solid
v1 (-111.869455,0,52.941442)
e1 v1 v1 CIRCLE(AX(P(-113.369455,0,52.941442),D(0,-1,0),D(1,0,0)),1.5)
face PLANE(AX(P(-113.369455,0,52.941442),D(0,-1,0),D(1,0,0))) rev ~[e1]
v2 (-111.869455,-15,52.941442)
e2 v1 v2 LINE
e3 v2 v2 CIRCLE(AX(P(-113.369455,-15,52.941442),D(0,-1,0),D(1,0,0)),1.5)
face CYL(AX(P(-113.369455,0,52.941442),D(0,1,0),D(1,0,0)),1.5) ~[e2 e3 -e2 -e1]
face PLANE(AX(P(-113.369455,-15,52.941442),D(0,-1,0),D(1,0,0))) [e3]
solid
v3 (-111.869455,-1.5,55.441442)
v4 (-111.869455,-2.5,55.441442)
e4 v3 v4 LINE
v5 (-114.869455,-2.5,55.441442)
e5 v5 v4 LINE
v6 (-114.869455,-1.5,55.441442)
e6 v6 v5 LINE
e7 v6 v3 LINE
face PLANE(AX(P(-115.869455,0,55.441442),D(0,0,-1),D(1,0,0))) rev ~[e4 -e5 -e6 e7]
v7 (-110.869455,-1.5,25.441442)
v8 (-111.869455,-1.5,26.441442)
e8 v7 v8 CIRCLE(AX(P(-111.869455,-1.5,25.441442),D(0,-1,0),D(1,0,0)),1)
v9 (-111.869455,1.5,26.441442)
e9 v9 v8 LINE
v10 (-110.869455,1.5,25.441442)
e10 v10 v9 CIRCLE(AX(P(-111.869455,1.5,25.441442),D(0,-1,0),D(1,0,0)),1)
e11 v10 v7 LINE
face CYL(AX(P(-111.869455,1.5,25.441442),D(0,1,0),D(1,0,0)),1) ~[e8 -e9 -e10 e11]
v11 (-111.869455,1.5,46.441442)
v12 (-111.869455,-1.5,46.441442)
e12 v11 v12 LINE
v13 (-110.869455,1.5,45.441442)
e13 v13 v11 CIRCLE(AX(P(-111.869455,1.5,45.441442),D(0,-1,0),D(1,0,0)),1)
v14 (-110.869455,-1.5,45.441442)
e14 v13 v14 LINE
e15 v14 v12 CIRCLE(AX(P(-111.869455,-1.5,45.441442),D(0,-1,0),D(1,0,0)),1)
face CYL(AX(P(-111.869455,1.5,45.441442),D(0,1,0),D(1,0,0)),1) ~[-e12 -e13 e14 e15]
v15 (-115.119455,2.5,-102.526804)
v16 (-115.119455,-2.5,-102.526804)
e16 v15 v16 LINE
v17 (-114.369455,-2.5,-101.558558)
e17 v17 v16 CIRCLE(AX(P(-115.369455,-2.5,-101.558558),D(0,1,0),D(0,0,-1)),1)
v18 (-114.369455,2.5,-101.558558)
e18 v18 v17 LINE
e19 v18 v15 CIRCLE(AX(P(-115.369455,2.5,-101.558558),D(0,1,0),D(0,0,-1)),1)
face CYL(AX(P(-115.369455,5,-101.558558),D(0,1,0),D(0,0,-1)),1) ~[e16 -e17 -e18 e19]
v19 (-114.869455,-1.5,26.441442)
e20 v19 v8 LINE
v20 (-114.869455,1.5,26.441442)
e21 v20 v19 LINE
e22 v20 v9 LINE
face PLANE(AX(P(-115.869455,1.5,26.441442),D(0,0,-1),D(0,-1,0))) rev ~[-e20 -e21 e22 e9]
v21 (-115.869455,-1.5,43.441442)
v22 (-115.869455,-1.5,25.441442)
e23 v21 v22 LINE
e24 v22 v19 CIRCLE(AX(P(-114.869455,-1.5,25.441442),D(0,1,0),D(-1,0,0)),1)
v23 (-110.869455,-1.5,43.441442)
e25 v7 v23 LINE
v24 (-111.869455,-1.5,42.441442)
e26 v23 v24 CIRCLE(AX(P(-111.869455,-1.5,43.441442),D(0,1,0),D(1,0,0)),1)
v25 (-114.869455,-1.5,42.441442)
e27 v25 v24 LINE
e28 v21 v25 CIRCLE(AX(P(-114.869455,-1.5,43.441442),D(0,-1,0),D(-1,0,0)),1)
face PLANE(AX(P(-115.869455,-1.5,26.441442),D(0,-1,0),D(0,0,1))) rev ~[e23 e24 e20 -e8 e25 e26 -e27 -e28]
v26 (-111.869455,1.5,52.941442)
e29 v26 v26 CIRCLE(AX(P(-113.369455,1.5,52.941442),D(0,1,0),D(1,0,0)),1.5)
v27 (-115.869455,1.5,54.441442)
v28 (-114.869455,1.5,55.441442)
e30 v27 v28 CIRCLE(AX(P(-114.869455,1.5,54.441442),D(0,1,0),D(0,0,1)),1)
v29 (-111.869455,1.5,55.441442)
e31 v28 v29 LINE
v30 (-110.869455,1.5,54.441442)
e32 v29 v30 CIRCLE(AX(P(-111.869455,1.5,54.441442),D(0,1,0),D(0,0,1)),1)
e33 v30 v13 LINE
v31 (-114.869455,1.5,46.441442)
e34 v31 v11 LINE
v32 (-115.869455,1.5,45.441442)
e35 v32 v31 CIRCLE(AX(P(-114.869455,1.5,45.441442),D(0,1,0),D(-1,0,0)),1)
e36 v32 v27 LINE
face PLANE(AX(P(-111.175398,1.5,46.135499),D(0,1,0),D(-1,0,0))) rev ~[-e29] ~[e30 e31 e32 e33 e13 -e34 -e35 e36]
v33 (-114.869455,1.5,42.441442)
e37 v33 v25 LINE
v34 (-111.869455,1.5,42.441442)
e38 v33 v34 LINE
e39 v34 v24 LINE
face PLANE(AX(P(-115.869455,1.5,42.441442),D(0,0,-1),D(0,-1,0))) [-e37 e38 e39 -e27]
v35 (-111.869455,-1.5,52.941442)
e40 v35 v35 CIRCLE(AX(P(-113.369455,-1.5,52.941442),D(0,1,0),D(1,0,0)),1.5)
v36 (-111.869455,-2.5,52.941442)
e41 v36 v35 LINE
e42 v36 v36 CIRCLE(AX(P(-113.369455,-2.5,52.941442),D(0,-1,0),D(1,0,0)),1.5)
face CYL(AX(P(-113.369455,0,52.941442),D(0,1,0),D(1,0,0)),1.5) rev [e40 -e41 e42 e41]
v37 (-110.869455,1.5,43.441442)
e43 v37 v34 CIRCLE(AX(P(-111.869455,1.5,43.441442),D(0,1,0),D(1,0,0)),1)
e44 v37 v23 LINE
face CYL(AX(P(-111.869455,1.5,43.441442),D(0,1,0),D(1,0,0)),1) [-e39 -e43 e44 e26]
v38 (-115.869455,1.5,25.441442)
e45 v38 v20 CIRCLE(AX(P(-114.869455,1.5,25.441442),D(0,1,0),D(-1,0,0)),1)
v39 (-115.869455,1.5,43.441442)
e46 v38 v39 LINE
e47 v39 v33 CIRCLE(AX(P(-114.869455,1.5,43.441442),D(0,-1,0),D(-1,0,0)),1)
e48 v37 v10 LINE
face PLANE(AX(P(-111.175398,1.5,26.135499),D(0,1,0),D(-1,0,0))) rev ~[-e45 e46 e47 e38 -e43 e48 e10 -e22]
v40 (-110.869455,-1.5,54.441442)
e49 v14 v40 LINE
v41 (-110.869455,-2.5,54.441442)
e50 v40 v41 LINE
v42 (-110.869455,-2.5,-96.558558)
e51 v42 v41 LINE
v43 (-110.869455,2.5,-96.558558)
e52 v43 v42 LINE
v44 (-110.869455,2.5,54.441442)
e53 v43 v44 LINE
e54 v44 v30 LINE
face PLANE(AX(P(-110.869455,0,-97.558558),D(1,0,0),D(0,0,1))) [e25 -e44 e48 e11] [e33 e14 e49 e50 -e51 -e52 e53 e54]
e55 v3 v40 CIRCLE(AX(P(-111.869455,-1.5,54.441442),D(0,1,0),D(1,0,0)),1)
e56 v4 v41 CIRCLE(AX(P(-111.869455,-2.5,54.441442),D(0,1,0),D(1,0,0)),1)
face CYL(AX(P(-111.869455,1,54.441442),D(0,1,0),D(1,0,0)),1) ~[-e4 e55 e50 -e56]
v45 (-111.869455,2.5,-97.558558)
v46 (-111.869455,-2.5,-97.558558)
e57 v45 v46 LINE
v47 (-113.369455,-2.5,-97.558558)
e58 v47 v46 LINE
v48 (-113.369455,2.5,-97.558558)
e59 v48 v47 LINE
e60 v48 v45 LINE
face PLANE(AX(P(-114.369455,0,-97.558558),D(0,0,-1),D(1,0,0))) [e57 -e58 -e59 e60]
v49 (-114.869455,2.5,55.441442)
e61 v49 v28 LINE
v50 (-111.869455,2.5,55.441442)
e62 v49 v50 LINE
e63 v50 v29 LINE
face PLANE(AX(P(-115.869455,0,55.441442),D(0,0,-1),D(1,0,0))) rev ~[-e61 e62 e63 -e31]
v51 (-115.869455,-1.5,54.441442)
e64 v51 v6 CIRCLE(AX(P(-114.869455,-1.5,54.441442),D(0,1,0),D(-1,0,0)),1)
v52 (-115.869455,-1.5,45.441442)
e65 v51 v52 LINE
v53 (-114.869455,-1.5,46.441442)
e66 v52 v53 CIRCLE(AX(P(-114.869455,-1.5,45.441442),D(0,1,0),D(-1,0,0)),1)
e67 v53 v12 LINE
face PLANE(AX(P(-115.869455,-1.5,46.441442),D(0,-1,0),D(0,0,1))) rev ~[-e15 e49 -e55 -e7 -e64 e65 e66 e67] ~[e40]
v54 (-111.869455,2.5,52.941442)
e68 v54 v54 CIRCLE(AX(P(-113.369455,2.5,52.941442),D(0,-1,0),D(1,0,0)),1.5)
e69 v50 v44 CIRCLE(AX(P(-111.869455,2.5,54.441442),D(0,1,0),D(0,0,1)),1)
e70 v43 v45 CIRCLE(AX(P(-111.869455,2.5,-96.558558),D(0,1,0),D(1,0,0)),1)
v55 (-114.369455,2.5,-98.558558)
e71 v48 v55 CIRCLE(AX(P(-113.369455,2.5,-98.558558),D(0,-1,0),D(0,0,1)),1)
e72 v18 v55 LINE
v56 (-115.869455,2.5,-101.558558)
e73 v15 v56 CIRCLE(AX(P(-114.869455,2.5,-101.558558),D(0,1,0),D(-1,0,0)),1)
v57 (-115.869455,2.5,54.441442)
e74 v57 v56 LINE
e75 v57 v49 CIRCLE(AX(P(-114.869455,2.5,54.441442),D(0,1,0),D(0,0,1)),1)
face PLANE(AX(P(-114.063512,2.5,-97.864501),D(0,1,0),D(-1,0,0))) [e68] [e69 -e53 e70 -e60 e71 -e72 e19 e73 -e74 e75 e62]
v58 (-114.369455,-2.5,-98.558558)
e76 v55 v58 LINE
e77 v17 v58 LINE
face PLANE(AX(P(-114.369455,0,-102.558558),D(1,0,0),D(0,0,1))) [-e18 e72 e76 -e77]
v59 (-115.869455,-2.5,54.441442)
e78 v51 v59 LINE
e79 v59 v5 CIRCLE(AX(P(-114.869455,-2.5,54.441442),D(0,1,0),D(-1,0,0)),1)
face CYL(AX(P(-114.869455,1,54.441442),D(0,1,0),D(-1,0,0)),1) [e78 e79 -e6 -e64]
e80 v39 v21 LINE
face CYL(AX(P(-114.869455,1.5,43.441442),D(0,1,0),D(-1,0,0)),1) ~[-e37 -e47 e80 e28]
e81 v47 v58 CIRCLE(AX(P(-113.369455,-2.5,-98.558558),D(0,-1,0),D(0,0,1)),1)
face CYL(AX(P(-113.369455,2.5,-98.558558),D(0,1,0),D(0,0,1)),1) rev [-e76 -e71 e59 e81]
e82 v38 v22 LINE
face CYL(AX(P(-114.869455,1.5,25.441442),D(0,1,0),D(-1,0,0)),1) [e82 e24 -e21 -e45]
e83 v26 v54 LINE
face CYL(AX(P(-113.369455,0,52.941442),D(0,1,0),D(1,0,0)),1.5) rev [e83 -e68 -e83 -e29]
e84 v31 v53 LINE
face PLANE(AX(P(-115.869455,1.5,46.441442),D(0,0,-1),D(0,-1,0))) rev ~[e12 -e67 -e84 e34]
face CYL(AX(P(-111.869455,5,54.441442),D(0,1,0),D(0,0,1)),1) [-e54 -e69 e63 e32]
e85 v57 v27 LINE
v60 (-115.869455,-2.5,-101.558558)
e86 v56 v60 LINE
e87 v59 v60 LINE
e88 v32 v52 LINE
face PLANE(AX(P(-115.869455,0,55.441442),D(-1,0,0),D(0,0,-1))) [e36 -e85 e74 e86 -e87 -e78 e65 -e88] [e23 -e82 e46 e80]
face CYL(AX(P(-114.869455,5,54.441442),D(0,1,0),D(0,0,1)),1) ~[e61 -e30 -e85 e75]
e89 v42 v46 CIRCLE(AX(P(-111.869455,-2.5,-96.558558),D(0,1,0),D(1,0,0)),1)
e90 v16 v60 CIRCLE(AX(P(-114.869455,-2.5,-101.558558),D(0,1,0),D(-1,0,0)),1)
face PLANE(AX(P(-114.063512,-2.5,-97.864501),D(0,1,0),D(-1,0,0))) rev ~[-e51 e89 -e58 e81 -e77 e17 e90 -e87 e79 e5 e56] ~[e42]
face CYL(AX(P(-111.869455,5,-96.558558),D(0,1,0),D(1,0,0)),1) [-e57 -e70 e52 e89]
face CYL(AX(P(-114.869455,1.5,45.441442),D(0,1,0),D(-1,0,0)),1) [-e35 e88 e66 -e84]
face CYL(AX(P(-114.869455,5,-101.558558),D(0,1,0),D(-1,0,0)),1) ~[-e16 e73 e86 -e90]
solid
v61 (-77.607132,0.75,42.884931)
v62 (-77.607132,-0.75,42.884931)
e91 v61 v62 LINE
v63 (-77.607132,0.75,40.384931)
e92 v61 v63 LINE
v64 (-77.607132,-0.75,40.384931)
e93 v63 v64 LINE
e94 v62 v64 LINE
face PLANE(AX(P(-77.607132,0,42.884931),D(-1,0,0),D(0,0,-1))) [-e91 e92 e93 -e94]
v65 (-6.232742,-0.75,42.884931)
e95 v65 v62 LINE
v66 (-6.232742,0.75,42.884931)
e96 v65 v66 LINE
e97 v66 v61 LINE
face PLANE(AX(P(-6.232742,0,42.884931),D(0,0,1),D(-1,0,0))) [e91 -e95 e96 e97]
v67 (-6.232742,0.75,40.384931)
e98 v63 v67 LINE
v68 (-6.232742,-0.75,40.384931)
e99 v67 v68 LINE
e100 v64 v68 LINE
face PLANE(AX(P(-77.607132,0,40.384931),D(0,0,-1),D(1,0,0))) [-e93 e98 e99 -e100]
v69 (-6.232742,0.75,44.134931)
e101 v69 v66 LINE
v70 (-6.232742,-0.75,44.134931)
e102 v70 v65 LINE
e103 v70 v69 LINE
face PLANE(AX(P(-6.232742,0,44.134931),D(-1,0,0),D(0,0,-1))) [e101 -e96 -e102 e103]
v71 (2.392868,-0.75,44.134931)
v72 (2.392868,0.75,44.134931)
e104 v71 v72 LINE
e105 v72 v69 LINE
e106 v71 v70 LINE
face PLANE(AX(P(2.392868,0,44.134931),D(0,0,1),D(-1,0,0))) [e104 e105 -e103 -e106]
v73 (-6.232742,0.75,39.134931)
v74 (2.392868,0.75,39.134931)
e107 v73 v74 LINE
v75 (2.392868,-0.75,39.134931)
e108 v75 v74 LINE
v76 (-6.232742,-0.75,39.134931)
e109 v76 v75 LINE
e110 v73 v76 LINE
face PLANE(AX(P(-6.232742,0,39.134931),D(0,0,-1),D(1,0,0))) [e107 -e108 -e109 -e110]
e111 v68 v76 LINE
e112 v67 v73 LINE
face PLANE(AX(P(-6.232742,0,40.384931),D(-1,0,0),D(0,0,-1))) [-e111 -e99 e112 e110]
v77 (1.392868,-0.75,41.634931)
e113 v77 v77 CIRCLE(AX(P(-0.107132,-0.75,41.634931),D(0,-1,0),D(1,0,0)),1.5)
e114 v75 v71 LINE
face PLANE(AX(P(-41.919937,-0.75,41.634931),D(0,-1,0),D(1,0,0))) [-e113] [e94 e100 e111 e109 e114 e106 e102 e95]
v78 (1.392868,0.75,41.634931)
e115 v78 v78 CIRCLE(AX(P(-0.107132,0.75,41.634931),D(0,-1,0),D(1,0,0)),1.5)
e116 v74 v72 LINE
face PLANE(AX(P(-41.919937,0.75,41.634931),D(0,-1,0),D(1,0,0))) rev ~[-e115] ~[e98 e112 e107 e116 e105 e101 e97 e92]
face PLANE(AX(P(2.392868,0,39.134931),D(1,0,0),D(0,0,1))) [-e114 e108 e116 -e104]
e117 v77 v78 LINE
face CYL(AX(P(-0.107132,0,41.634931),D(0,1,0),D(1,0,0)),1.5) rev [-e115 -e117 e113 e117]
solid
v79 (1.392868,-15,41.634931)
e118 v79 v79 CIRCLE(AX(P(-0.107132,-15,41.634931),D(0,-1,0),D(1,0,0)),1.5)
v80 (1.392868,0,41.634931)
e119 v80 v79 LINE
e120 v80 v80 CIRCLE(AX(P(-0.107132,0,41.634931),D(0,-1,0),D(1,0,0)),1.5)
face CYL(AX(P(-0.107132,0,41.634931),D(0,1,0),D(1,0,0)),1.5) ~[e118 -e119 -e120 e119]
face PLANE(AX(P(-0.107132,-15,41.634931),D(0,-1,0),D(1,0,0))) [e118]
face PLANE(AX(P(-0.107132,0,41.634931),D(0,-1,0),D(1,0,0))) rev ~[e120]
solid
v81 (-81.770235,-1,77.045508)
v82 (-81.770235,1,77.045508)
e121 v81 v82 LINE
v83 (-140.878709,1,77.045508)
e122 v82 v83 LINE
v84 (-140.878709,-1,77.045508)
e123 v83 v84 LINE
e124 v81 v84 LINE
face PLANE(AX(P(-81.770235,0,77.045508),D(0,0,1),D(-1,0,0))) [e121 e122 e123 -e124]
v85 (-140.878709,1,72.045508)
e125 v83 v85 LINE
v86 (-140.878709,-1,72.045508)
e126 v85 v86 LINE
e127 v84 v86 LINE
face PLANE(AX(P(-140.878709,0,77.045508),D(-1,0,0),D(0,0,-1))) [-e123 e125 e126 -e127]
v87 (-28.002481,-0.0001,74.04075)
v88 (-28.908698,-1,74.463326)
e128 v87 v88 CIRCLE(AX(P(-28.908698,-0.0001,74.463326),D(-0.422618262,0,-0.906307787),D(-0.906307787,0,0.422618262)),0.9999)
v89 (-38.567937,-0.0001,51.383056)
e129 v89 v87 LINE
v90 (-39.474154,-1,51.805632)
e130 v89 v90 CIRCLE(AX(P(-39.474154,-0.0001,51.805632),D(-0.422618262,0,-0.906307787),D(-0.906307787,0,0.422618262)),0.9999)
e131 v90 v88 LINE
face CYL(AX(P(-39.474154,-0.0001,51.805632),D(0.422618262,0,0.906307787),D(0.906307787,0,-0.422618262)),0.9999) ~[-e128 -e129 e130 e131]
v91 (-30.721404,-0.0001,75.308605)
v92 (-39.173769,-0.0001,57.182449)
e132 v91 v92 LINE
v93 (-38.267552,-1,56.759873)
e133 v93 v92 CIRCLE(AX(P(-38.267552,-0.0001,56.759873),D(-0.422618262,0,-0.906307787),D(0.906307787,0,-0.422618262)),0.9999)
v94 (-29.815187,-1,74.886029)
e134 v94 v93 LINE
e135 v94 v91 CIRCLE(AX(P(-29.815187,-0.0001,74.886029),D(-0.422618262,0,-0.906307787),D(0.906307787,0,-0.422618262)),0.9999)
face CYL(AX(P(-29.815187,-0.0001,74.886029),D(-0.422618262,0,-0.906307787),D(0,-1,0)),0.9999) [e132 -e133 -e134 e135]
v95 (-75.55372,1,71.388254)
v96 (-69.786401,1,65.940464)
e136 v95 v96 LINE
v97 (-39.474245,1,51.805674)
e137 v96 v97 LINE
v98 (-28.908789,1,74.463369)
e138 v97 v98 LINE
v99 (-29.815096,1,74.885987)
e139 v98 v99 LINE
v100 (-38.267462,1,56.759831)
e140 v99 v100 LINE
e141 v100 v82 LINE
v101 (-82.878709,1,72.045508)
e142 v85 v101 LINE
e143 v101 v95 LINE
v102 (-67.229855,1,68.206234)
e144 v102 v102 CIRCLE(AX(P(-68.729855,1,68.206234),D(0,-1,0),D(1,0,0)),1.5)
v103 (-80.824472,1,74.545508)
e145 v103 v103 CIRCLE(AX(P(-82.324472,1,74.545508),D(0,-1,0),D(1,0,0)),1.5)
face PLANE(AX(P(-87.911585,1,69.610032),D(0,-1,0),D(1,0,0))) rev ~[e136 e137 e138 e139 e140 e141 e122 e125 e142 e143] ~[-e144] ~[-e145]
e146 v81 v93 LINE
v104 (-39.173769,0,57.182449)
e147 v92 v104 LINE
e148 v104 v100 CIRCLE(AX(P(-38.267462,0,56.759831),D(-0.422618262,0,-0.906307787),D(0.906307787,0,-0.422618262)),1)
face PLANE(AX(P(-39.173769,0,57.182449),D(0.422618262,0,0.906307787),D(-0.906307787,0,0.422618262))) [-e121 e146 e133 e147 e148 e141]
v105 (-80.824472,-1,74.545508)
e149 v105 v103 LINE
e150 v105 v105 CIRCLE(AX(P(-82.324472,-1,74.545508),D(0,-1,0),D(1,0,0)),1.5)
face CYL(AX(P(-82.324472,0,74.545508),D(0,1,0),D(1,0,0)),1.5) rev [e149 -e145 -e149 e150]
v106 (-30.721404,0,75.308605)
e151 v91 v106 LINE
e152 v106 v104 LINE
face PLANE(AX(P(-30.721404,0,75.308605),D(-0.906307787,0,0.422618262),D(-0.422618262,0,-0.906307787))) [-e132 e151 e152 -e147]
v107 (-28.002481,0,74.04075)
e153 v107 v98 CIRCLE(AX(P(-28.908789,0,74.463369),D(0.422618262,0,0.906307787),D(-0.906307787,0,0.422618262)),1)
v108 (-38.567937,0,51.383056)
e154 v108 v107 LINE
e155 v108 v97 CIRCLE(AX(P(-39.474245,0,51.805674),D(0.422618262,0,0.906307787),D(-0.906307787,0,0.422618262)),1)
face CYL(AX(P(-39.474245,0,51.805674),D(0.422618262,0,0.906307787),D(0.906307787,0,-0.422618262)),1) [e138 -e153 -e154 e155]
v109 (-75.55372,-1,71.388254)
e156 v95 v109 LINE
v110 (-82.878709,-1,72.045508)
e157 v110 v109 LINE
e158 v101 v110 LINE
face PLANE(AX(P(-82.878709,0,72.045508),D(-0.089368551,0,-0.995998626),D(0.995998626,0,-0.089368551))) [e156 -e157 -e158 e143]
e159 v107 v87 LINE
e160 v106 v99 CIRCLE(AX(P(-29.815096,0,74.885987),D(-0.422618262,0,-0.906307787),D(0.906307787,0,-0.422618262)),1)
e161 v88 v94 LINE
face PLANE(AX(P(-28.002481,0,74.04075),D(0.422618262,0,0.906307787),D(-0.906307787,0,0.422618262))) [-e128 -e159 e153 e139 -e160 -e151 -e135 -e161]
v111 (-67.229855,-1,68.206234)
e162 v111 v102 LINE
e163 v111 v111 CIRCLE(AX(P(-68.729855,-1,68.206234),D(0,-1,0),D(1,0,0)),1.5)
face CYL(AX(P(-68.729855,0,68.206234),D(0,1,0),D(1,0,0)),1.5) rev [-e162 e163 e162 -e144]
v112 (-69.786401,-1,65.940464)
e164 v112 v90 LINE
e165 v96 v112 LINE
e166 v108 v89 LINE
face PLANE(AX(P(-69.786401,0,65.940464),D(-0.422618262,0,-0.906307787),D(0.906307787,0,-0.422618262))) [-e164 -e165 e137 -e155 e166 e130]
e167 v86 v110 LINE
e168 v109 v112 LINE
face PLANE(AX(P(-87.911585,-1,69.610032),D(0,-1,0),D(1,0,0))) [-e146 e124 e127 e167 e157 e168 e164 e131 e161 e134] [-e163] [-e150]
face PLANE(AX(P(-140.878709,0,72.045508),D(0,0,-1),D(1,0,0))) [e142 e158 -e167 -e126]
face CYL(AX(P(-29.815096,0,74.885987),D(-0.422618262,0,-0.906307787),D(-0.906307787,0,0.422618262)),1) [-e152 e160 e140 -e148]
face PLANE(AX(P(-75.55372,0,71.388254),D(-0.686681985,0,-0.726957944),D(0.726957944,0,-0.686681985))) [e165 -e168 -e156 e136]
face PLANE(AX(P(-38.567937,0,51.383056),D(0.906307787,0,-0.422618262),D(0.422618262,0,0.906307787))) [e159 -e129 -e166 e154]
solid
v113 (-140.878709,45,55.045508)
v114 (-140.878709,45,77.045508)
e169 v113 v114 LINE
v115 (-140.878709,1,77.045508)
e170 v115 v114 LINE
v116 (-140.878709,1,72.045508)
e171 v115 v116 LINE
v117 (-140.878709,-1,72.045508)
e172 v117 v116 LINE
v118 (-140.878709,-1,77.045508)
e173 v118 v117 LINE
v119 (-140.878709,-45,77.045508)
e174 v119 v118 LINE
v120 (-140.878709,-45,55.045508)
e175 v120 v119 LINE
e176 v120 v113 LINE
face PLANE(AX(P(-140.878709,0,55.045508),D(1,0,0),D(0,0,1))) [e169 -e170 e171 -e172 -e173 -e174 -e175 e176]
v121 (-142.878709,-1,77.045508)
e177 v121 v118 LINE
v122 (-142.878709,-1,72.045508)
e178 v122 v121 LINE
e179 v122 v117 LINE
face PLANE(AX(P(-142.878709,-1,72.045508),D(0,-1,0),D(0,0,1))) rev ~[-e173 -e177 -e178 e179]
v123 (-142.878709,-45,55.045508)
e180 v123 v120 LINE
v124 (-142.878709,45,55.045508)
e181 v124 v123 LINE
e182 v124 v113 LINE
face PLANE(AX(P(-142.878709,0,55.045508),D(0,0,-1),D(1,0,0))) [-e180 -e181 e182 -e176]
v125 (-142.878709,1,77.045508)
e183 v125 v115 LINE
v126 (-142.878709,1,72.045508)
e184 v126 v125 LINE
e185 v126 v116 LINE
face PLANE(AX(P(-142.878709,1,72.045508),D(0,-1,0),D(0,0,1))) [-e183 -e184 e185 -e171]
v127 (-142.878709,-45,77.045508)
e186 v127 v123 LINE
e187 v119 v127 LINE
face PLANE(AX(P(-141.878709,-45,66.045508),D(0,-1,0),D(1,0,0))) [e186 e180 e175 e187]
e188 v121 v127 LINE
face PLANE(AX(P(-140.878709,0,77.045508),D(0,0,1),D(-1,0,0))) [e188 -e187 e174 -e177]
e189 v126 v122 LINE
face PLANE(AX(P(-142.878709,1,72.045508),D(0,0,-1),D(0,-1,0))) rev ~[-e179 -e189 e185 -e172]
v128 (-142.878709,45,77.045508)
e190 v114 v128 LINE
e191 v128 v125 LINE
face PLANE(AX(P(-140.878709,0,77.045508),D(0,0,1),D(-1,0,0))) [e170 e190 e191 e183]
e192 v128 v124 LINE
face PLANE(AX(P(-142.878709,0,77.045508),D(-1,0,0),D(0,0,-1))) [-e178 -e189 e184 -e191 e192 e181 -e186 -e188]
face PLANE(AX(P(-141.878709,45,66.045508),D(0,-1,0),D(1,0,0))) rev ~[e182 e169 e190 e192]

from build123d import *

# Parameters (mm, degrees)
F0_R        = 1.5
F1_DEPTH    = 0.75
F0_W        = 5
F0_H        = 12.5
F0_H_2      = 16
F2_DEPTH    = 2.5
F3_DEPTH    = 1
F4_DEPTH    = 45
F5_W        = 3
F5_H        = 9
F5_H_2      = 16
F6_DEPTH    = 118.2633225451
F7_T1_DEPTH = 5
F7_T3_DEPTH = 6
F7_T5_DEPTH = 6
F7_T7_DEPTH = 10
F7_T9_DEPTH = 3
F7_2_F1_R   = 1
F7_2_F2_R   = 0.9999
F7_2_F3_R   = 1
F7_2_F4_R   = 0.9999
F9_W        = 2
F9_H        = 5
F10_DEPTH   = 25
F11_DEPTH   = 15


# Not quite as in the source:
# - a fillet or chamfer that OpenCascade refuses, or shapes differently, is made with other operations: its cross-section is extruded or revolved along the edge and cut away or added
# - two fillets or chamfers of one size are made in one step
# - a fillet or chamfer is up to 0.001 mm smaller than in the source, because OpenCascade refuses the exact size


with BuildPart() as f1:
    # F0 (on Front) → F1 (new body, symmetric)
    with BuildSketch(Plane.XZ):
        Polygon((-6.2327417545, 42.8849308193), (-77.6071324944, 42.8849308193), (-77.6071324944, 40.3849308193), (-6.2327417545, 40.3849308193), (-6.2327417545, 41.6349308193), align=None)
        Polygon((2.3928675056, 44.1349308193), (-6.2327417545, 44.1349308193), (-6.2327417545, 42.8849308193), (-6.2327417545, 41.6349308193), (-6.2327417545, 40.3849308193), (-6.2327417545, 39.1349308193), (2.3928675056, 39.1349308193), align=None)
        with Locations((-0.1071324944, 41.6349308193)):
            Circle(F0_R, mode=Mode.SUBTRACT)
    extrude(amount=F1_DEPTH, both=True)


with BuildPart() as f2:
    # F0 (on Front) → F2 (new body, symmetric)
    with BuildSketch(Plane.XZ):
        with Locations((-113.3694550395, 49.191441834)):
            Rectangle(F0_W, F0_H)
        with Locations((-113.3694550395, 52.941441834)):
            Circle(F0_R, mode=Mode.SUBTRACT)
        Polygon((-110.8694550395, 26.941441834), (-115.8694550395, 26.941441834), (-115.8694550395, -102.558558166), (-114.3694550395, -102.558558166), (-114.3694550395, -97.558558166), (-112.3694550395, -97.558558166), (-110.8694550395, -97.558558166), align=None)
        with Locations((-113.3694550395, 34.941441834)):
            Rectangle(F0_W, F0_H_2)
    extrude(amount=F2_DEPTH, both=True)

    # F5 (on face) → F6 (cut, through all)
    with BuildSketch(Plane(origin=(-115.8694550395, 0, 0), x_dir=(0, -1, 0), z_dir=(-1, 0, 0))):
        with Locations((0, 50.941441834)):
            Rectangle(F5_W, F5_H)
        with Locations((0, 34.441441834)):
            Rectangle(F5_W, F5_H_2)
    extrude(amount=-F6_DEPTH, mode=Mode.SUBTRACT)

    # F7: fillet of radius 1 on 14 edges, made by hand

    # F7_s2 → F7_t1 (join)
    with BuildSketch(Plane.XZ.offset(-2.5)):
        with BuildLine():
            ThreePointArc((-113.3694550395, -97.558558166), (-114.0765618207, -97.8514513848), (-114.3694550395, -98.558558166))
            Line((-114.3694550395, -98.558558166), (-114.3694550395, -97.558558166))
            Line((-114.3694550395, -97.558558166), (-113.3694550395, -97.558558166))
        make_face()
    extrude(amount=F7_T1_DEPTH)

    # F7_s4 → F7_t3 (cut)
    with BuildSketch(Plane.XZ.offset(-1)):
        with BuildLine():
            ThreePointArc((-110.8694550395, 54.441441834), (-111.1623482583, 55.1485486152), (-111.8694550395, 55.441441834))
            Line((-111.8694550395, 55.441441834), (-110.8694550395, 55.441441834))
            Line((-110.8694550395, 55.441441834), (-110.8694550395, 54.441441834))
        make_face()
        with BuildLine():
            ThreePointArc((-115.8694550395, 54.441441834), (-115.5765618207, 55.1485486152), (-114.8694550395, 55.441441834))
            Line((-114.8694550395, 55.441441834), (-115.8694550395, 55.441441834))
            Line((-115.8694550395, 55.441441834), (-115.8694550395, 54.441441834))
        make_face()
    extrude(amount=F7_T3_DEPTH, mode=Mode.SUBTRACT)

    # F7_s6 → F7_t5 (cut)
    with BuildSketch(Plane.XZ.offset(-5)):
        with BuildLine():
            ThreePointArc((-111.8694550395, 55.441441834), (-111.1623482583, 55.1485486152), (-110.8694550395, 54.441441834))
            Line((-110.8694550395, 54.441441834), (-110.8694550395, 55.441441834))
            Line((-110.8694550395, 55.441441834), (-111.8694550395, 55.441441834))
        make_face()
        with BuildLine():
            ThreePointArc((-114.8694550395, 55.441441834), (-115.5765618207, 55.1485486152), (-115.8694550395, 54.441441834))
            Line((-115.8694550395, 54.441441834), (-115.8694550395, 55.441441834))
            Line((-115.8694550395, 55.441441834), (-114.8694550395, 55.441441834))
        make_face()
    extrude(amount=F7_T5_DEPTH, mode=Mode.SUBTRACT)

    # F7_s8 → F7_t7 (cut)
    with BuildSketch(Plane.XZ.offset(-5)):
        with BuildLine():
            ThreePointArc((-115.3694550395, -102.558558166), (-114.6623482583, -102.2656649472), (-114.3694550395, -101.558558166))
            Line((-114.3694550395, -101.558558166), (-114.3694550395, -102.558558166))
            Line((-114.3694550395, -102.558558166), (-115.3694550395, -102.558558166))
        make_face()
        with BuildLine():
            ThreePointArc((-115.8694550395, -101.558558166), (-115.5765618207, -102.2656649472), (-114.8694550395, -102.558558166))
            Line((-114.8694550395, -102.558558166), (-115.8694550395, -102.558558166))
            Line((-115.8694550395, -102.558558166), (-115.8694550395, -101.558558166))
        make_face()
        with BuildLine():
            ThreePointArc((-110.8694550395, -96.558558166), (-111.1623482583, -97.2656649472), (-111.8694550395, -97.558558166))
            Line((-111.8694550395, -97.558558166), (-110.8694550395, -97.558558166))
            Line((-110.8694550395, -97.558558166), (-110.8694550395, -96.558558166))
        make_face()
    extrude(amount=F7_T7_DEPTH, mode=Mode.SUBTRACT)

    # F7_s10 → F7_t9 (cut)
    with BuildSketch(Plane.XZ.offset(-1.5)):
        with BuildLine():
            ThreePointArc((-110.8694550395, 43.441441834), (-111.1623482583, 42.7343350528), (-111.8694550395, 42.441441834))
            Line((-111.8694550395, 42.441441834), (-110.8694550395, 42.441441834))
            Line((-110.8694550395, 42.441441834), (-110.8694550395, 43.441441834))
        make_face()
        with BuildLine():
            ThreePointArc((-110.8694550395, 25.441441834), (-111.1623482583, 26.1485486152), (-111.8694550395, 26.441441834))
            Line((-111.8694550395, 26.441441834), (-110.8694550395, 26.441441834))
            Line((-110.8694550395, 26.441441834), (-110.8694550395, 25.441441834))
        make_face()
        with BuildLine():
            ThreePointArc((-115.8694550395, 43.441441834), (-115.5765618207, 42.7343350528), (-114.8694550395, 42.441441834))
            Line((-114.8694550395, 42.441441834), (-115.8694550395, 42.441441834))
            Line((-115.8694550395, 42.441441834), (-115.8694550395, 43.441441834))
        make_face()
        with BuildLine():
            ThreePointArc((-115.8694550395, 25.441441834), (-115.5765618207, 26.1485486152), (-114.8694550395, 26.441441834))
            Line((-114.8694550395, 26.441441834), (-115.8694550395, 26.441441834))
            Line((-115.8694550395, 26.441441834), (-115.8694550395, 25.441441834))
        make_face()
        with BuildLine():
            ThreePointArc((-115.8694550395, 45.441441834), (-115.5765618207, 46.1485486152), (-114.8694550395, 46.441441834))
            Line((-114.8694550395, 46.441441834), (-115.8694550395, 46.441441834))
            Line((-115.8694550395, 46.441441834), (-115.8694550395, 45.441441834))
        make_face()
        with BuildLine():
            ThreePointArc((-110.8694550395, 45.441441834), (-111.1623482583, 46.1485486152), (-111.8694550395, 46.441441834))
            Line((-111.8694550395, 46.441441834), (-110.8694550395, 46.441441834))
            Line((-110.8694550395, 46.441441834), (-110.8694550395, 45.441441834))
        make_face()
    extrude(amount=F7_T9_DEPTH, mode=Mode.SUBTRACT)


with BuildPart() as f3:
    # F0 (on Front) → F3 (new body, symmetric)
    with BuildSketch(Plane.XZ):
        Polygon((-81.7702353249, 77.0455077887), (-140.8787086381, 77.0455077887), (-140.8787086381, 72.0455077887), (-82.8787086381, 72.0455077887), (-75.5537198958, 71.3882542396), (-69.7864008303, 65.940464395), (-38.5679372817, 51.3830557664), (-36.454845973, 55.9145947016), (-39.1737693341, 57.1824494868), align=None)
        with Locations((-82.3244719815, 74.5455077887)):
            Circle(F0_R, mode=Mode.SUBTRACT)
        with Locations((-68.7298551759, 68.2062338625)):
            Circle(F0_R, mode=Mode.SUBTRACT)
        Polygon((-30.7214040993, 75.3086052276), (-39.1737693341, 57.1824494868), (-36.454845973, 55.9145947016), (-28.0024807382, 74.0407504424), align=None)
    extrude(amount=F3_DEPTH, both=True)

    # F7#2: fillet of radius 1 on 4 edges, made by hand

    # F7_2_f1
    f7_2_f1_edges = [f3.edges().sort_by_distance(p)[0] for p in [
        (-34.9475867167, 1, 66.2455273572),
    ]]
    fillet(f7_2_f1_edges, radius=F7_2_F1_R)

    # F7_2_f2 (radius 1 in the source; OpenCascade refuses exactly that, so slightly less here)
    f7_2_f2_edges = [f3.edges().sort_by_distance(p)[0] for p in [
        (-34.9475867167, -1, 66.2455273572),
    ]]
    fillet(f7_2_f2_edges, radius=F7_2_F2_R)

    # F7_2_f3
    f7_2_f3_edges = [f3.edges().sort_by_distance(p)[0] for p in [
        (-33.28520901, 1, 62.7119031044),
    ]]
    fillet(f7_2_f3_edges, radius=F7_2_F3_R)

    # F7_2_f4 (radius 1 in the source; OpenCascade refuses exactly that, so slightly less here)
    f7_2_f4_edges = [f3.edges().sort_by_distance(p)[0] for p in [
        (-33.28520901, -1, 62.7119031044),
    ]]
    fillet(f7_2_f4_edges, radius=F7_2_F4_R)


with BuildPart() as f4:
    # F0 (on Front) → F4 (new body, symmetric)
    with BuildSketch(Plane.XZ):
        Polygon((-140.8787086381, 77.0455077887), (-142.8787086381, 77.0455077887), (-142.8787086381, 55.0455077887), (-140.8787086381, 55.0455077887), (-140.8787086381, 72.0455077887), align=None)
    extrude(amount=F4_DEPTH, both=True)

    # F9 (on face) → F10 (cut)
    with BuildSketch(Plane(origin=(-142.8787086381, 0, 0), x_dir=(0, -1, 0), z_dir=(-1, 0, 0))):
        with Locations((0, 74.5455077887)):
            Rectangle(F9_W, F9_H)
    extrude(amount=-F10_DEPTH, mode=Mode.SUBTRACT)


with BuildPart() as f11:
    # F0 (on Front) → F11 (new body)
    with BuildSketch(Plane.XZ):
        with Locations((-113.3694550395, 52.941441834)):
            Circle(F0_R)
    extrude(amount=F11_DEPTH)


with BuildPart() as f11b:
    # F0 (on Front) → F11, piece 2 (new body)
    with BuildSketch(Plane.XZ):
        with Locations((-0.1071324944, 41.6349308193)):
            Circle(F0_R)
    extrude(amount=F11_DEPTH)


solid = Compound([f1.part, f2.part, f3.part, f4.part, f11.part, f11b.part])
